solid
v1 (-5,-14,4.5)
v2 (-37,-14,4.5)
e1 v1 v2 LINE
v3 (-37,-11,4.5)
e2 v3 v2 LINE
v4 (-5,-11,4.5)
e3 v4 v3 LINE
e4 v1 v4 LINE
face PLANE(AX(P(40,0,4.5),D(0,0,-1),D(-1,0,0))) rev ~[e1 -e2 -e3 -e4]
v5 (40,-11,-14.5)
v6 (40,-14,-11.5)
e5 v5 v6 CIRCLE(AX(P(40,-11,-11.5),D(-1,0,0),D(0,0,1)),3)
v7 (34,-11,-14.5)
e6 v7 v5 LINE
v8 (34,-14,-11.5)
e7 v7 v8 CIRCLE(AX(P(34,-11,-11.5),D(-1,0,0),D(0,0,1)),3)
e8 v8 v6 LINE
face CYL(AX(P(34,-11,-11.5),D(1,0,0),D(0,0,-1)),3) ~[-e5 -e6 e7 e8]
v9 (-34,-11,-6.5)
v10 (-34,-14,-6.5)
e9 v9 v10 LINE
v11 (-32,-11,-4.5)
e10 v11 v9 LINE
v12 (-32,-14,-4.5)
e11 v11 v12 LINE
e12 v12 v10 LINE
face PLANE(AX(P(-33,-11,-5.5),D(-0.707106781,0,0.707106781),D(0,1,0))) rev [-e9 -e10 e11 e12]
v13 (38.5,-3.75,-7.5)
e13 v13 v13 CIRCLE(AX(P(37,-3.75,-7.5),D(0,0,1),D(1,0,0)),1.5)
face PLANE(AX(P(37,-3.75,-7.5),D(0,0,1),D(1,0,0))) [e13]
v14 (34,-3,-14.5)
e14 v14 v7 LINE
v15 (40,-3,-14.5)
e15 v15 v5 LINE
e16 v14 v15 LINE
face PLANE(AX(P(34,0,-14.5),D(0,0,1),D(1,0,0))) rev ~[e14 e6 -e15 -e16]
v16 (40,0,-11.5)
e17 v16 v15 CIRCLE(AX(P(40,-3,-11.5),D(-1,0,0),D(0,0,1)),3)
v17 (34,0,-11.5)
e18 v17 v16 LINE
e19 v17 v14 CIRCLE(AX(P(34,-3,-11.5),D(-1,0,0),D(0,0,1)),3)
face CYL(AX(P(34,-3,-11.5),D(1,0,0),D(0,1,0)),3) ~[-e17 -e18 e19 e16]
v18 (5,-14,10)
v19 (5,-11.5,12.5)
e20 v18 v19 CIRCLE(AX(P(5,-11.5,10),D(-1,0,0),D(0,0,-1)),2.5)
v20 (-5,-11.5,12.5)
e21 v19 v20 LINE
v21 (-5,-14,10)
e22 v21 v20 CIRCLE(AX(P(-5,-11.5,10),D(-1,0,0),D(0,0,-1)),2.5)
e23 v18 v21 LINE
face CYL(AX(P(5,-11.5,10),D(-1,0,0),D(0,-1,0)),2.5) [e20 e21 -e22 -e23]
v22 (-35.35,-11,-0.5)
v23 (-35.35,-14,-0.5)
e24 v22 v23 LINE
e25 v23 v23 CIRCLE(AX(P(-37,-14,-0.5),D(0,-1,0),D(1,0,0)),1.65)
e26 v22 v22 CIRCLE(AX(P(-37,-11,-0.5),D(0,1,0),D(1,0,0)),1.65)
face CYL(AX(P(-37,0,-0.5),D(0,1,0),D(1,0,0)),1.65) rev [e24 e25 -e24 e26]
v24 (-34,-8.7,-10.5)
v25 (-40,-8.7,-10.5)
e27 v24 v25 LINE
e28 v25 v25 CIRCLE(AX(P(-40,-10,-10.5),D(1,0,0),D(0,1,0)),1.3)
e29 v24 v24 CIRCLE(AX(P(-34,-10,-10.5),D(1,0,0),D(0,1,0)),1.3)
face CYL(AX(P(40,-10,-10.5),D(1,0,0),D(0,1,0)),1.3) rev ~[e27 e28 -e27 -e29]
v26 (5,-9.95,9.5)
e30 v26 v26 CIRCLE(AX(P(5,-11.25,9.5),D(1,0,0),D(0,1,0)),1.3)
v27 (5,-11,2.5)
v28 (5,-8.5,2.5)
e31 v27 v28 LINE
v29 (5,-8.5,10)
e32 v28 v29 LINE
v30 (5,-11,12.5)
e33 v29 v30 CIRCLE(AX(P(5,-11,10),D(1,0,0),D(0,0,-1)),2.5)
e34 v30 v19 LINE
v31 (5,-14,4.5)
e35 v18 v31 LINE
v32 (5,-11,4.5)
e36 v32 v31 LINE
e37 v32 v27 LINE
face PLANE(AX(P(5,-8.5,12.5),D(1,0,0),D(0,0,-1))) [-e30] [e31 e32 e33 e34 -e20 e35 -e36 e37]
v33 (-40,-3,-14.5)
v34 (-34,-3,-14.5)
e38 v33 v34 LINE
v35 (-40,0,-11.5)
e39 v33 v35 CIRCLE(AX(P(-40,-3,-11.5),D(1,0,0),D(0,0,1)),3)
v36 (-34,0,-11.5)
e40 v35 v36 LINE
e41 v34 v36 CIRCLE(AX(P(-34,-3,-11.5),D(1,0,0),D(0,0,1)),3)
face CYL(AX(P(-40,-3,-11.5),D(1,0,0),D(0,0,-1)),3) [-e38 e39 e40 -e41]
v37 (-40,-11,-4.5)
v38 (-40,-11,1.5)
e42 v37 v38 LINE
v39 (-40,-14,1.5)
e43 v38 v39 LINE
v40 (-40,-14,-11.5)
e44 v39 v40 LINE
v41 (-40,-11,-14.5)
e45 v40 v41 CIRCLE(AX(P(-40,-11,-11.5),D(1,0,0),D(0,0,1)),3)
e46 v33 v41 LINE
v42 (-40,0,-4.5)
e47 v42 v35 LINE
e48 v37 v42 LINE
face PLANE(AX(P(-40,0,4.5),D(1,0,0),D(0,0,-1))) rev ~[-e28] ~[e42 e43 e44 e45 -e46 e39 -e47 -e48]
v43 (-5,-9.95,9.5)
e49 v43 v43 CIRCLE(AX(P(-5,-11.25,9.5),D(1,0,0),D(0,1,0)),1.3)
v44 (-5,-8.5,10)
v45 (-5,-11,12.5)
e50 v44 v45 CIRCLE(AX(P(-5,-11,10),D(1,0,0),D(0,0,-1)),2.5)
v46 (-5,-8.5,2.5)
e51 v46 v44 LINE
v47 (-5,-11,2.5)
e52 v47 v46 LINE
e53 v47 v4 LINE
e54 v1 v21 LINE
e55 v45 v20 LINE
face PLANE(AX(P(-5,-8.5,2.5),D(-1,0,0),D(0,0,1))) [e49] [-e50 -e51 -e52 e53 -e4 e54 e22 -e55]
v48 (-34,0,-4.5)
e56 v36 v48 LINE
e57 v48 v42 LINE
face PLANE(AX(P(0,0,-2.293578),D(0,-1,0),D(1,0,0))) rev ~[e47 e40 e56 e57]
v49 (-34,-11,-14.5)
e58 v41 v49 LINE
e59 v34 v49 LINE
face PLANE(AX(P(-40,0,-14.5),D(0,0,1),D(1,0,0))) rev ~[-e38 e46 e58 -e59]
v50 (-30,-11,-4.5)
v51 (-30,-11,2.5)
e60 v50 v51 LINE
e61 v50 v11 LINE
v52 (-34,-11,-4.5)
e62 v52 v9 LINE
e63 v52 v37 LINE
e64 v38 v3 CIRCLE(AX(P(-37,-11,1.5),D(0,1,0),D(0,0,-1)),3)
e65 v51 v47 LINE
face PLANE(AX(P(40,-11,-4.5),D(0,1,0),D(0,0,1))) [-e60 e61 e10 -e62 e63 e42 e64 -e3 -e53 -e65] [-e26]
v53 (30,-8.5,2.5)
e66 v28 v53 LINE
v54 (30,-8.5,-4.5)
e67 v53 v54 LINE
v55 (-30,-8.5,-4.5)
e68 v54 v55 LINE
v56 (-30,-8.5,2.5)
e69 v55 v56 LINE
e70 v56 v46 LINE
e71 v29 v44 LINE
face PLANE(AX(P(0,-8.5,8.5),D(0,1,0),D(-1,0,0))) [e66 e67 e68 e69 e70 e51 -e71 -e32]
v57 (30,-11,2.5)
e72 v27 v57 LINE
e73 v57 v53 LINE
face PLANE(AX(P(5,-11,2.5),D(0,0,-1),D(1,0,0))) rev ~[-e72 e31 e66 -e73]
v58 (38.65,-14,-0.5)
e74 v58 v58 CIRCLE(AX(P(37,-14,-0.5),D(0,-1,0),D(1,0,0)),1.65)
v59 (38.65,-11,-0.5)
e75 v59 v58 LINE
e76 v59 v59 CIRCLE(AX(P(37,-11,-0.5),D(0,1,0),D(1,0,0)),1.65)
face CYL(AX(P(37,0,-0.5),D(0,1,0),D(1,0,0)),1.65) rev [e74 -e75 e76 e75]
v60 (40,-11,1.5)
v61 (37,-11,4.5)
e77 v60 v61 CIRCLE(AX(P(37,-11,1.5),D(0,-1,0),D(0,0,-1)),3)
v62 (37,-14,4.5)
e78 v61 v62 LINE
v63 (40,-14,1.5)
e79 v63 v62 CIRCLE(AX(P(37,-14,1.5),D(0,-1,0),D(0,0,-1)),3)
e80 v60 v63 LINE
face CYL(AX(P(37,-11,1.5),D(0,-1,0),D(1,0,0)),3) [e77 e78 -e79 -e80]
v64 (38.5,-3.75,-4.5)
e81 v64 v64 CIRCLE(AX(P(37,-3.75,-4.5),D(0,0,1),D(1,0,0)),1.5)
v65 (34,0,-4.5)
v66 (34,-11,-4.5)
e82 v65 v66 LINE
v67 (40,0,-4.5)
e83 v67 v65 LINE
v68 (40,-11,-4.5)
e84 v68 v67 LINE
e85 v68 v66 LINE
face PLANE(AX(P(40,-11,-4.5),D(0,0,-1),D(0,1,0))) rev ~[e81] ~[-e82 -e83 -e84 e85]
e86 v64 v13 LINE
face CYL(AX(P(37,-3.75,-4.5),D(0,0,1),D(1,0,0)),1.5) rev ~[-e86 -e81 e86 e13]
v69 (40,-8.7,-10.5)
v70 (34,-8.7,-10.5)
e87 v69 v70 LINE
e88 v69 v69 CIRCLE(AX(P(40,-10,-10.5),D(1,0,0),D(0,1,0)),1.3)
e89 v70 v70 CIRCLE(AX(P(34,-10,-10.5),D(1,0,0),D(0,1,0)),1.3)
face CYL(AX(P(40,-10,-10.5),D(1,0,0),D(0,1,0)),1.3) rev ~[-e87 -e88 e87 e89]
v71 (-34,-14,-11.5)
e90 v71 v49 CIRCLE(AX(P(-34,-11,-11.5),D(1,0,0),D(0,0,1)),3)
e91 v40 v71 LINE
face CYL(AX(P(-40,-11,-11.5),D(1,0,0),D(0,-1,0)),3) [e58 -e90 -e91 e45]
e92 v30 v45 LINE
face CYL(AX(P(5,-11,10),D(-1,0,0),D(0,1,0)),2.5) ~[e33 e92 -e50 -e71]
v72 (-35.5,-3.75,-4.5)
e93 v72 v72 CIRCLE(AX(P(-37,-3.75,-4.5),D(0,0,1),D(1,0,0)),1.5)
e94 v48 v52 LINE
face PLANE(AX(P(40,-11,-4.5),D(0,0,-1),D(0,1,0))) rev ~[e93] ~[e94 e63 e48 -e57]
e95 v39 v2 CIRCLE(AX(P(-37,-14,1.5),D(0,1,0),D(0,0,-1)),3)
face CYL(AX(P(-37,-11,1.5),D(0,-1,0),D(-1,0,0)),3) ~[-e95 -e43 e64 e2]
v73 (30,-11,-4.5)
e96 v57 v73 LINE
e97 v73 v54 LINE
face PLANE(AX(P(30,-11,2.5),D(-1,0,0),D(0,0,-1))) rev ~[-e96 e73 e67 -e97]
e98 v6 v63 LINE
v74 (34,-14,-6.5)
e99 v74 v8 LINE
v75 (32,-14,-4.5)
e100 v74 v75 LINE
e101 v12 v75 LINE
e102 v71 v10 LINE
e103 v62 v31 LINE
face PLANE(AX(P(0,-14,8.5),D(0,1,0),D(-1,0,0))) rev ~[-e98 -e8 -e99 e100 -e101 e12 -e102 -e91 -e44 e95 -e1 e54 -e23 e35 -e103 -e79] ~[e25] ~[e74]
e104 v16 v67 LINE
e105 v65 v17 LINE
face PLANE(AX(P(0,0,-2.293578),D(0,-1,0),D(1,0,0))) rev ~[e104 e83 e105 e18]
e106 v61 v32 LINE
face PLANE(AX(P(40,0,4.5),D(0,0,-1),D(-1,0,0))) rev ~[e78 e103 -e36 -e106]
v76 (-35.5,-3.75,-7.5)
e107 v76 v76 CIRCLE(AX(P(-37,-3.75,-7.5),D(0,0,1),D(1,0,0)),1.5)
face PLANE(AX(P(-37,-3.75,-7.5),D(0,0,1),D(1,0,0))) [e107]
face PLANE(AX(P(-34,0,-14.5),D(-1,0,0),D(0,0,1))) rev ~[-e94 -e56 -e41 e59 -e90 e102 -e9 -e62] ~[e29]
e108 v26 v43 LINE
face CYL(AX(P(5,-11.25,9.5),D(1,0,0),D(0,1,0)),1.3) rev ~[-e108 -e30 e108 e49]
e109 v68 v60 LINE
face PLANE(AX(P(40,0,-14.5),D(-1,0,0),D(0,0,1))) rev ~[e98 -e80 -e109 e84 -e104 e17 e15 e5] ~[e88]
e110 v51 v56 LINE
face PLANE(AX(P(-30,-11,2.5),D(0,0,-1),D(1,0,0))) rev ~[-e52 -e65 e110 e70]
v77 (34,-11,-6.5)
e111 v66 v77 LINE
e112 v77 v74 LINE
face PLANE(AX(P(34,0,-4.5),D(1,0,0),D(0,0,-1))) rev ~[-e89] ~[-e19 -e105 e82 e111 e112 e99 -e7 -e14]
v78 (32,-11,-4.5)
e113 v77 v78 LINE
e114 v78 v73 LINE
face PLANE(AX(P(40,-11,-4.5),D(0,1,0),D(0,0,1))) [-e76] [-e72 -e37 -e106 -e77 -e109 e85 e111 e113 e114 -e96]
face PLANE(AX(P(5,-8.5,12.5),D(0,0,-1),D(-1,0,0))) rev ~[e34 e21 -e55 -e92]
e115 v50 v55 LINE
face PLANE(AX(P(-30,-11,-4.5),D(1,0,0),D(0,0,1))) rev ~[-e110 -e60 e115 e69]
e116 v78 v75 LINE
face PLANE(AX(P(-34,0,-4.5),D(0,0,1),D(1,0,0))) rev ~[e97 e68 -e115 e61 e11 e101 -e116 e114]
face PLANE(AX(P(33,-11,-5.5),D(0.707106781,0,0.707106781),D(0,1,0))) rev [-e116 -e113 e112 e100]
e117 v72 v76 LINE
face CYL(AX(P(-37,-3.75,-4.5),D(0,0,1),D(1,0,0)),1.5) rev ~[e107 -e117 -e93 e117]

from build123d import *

# Parameters (mm, degrees)
F0_R      = 1.65
F1_DEPTH  = 14
F2_W      = 11
F2_H      = 9
F3_DEPTH  = 80.001
F4_R      = 1.3
F5_DEPTH  = 80.001
F6_R      = 3
F7_SIZE   = 2
F8_R      = 1.5
F9_DEPTH  = 3
F11_DEPTH = 2.5
F12_W     = 10
F12_H     = 8
F12_H_2   = 2
F13_DEPTH = 5.5
F14_R     = 2.5
F15_R     = 1.3
F16_DEPTH = 45.001


with BuildPart() as f1:
    # F0 (on Front) → F1 (new body)
    with BuildSketch(Plane.XZ):
        Polygon((-34, -4.5), (34, -4.5), (34, -14.5), (40, -14.5), (40, -4.5), (40, 4.5), (-40, 4.5), (-40, -4.5), (-40, -14.5), (-34, -14.5), align=None)
        with Locations((-37, -0.5)):
            Circle(F0_R, mode=Mode.SUBTRACT)
        with Locations((37, -0.5)):
            Circle(F0_R, mode=Mode.SUBTRACT)
    extrude(amount=F1_DEPTH)

    # F2 (on face) → F3 (cut, through all)
    with BuildSketch(Plane.YZ.offset(40)):
        with Locations((-5.5, 0)):
            Rectangle(F2_W, F2_H)
    extrude(amount=-F3_DEPTH, mode=Mode.SUBTRACT)

    # F4 (on face) → F5 (cut, through all)
    with BuildSketch(Plane.YZ.offset(40)):
        with Locations((-10, -10.5)):
            Circle(F4_R)
    extrude(amount=-F5_DEPTH, mode=Mode.SUBTRACT)

    # F6
    f6_edges = [f1.edges().sort_by_distance(p)[0] for p in [
        (37, -14, -14.5),
        (-37, -14, -14.5),
        (-37, 0, -14.5),
        (37, 0, -14.5),
        (40, -12.5, 4.5),
        (-40, -12.5, 4.5),
    ]]
    fillet(f6_edges, radius=F6_R)

    # F7
    f7_edges = [f1.edges().sort_by_distance(p)[0] for p in [
        (34, -12.5, -4.5),
        (-34, -12.5, -4.5),
    ]]
    chamfer(f7_edges, length=F7_SIZE)

    # F8 (on face) → F9 (cut)
    with BuildSketch(Plane.XY.offset(-4.5)):
        with Locations((-37, -3.75)):
            Circle(F8_R)
        with Locations((37, -3.75)):
            Circle(F8_R)
    extrude(amount=-F9_DEPTH, mode=Mode.SUBTRACT)

    # F10 (on face) → F11 (join)
    with BuildSketch(Plane(origin=(0, -11, 0), x_dir=(-1, 0, 0), z_dir=(0, 1, 0))):
        Polygon((-5, 2.5), (-30, 2.5), (-30, -4.5), (30, -4.5), (30, 2.5), (5, 2.5), (5, 4.5), (-5, 4.5), align=None)
    extrude(amount=F11_DEPTH)

    # F12 (on face) → F13 (join)
    with BuildSketch(Plane(origin=(0, -8.5, 0), x_dir=(-1, 0, 0), z_dir=(0, 1, 0))):
        with Locations((0, 8.5)):
            Rectangle(F12_W, F12_H)
        with Locations((0, 3.5)):
            Rectangle(F12_W, F12_H_2)
    extrude(amount=-F13_DEPTH)

    # F14
    f14_edges = [f1.edges().sort_by_distance(p)[0] for p in [
        (0, -14, 12.5),
        (0, -8.5, 12.5),
    ]]
    fillet(f14_edges, radius=F14_R)

    # F15 (on face) → F16 (cut, through all)
    with BuildSketch(Plane.YZ.offset(5)):
        with Locations((-11.25, 9.5)):
            Circle(F15_R)
    extrude(amount=-F16_DEPTH, mode=Mode.SUBTRACT)


solid = f1.part
